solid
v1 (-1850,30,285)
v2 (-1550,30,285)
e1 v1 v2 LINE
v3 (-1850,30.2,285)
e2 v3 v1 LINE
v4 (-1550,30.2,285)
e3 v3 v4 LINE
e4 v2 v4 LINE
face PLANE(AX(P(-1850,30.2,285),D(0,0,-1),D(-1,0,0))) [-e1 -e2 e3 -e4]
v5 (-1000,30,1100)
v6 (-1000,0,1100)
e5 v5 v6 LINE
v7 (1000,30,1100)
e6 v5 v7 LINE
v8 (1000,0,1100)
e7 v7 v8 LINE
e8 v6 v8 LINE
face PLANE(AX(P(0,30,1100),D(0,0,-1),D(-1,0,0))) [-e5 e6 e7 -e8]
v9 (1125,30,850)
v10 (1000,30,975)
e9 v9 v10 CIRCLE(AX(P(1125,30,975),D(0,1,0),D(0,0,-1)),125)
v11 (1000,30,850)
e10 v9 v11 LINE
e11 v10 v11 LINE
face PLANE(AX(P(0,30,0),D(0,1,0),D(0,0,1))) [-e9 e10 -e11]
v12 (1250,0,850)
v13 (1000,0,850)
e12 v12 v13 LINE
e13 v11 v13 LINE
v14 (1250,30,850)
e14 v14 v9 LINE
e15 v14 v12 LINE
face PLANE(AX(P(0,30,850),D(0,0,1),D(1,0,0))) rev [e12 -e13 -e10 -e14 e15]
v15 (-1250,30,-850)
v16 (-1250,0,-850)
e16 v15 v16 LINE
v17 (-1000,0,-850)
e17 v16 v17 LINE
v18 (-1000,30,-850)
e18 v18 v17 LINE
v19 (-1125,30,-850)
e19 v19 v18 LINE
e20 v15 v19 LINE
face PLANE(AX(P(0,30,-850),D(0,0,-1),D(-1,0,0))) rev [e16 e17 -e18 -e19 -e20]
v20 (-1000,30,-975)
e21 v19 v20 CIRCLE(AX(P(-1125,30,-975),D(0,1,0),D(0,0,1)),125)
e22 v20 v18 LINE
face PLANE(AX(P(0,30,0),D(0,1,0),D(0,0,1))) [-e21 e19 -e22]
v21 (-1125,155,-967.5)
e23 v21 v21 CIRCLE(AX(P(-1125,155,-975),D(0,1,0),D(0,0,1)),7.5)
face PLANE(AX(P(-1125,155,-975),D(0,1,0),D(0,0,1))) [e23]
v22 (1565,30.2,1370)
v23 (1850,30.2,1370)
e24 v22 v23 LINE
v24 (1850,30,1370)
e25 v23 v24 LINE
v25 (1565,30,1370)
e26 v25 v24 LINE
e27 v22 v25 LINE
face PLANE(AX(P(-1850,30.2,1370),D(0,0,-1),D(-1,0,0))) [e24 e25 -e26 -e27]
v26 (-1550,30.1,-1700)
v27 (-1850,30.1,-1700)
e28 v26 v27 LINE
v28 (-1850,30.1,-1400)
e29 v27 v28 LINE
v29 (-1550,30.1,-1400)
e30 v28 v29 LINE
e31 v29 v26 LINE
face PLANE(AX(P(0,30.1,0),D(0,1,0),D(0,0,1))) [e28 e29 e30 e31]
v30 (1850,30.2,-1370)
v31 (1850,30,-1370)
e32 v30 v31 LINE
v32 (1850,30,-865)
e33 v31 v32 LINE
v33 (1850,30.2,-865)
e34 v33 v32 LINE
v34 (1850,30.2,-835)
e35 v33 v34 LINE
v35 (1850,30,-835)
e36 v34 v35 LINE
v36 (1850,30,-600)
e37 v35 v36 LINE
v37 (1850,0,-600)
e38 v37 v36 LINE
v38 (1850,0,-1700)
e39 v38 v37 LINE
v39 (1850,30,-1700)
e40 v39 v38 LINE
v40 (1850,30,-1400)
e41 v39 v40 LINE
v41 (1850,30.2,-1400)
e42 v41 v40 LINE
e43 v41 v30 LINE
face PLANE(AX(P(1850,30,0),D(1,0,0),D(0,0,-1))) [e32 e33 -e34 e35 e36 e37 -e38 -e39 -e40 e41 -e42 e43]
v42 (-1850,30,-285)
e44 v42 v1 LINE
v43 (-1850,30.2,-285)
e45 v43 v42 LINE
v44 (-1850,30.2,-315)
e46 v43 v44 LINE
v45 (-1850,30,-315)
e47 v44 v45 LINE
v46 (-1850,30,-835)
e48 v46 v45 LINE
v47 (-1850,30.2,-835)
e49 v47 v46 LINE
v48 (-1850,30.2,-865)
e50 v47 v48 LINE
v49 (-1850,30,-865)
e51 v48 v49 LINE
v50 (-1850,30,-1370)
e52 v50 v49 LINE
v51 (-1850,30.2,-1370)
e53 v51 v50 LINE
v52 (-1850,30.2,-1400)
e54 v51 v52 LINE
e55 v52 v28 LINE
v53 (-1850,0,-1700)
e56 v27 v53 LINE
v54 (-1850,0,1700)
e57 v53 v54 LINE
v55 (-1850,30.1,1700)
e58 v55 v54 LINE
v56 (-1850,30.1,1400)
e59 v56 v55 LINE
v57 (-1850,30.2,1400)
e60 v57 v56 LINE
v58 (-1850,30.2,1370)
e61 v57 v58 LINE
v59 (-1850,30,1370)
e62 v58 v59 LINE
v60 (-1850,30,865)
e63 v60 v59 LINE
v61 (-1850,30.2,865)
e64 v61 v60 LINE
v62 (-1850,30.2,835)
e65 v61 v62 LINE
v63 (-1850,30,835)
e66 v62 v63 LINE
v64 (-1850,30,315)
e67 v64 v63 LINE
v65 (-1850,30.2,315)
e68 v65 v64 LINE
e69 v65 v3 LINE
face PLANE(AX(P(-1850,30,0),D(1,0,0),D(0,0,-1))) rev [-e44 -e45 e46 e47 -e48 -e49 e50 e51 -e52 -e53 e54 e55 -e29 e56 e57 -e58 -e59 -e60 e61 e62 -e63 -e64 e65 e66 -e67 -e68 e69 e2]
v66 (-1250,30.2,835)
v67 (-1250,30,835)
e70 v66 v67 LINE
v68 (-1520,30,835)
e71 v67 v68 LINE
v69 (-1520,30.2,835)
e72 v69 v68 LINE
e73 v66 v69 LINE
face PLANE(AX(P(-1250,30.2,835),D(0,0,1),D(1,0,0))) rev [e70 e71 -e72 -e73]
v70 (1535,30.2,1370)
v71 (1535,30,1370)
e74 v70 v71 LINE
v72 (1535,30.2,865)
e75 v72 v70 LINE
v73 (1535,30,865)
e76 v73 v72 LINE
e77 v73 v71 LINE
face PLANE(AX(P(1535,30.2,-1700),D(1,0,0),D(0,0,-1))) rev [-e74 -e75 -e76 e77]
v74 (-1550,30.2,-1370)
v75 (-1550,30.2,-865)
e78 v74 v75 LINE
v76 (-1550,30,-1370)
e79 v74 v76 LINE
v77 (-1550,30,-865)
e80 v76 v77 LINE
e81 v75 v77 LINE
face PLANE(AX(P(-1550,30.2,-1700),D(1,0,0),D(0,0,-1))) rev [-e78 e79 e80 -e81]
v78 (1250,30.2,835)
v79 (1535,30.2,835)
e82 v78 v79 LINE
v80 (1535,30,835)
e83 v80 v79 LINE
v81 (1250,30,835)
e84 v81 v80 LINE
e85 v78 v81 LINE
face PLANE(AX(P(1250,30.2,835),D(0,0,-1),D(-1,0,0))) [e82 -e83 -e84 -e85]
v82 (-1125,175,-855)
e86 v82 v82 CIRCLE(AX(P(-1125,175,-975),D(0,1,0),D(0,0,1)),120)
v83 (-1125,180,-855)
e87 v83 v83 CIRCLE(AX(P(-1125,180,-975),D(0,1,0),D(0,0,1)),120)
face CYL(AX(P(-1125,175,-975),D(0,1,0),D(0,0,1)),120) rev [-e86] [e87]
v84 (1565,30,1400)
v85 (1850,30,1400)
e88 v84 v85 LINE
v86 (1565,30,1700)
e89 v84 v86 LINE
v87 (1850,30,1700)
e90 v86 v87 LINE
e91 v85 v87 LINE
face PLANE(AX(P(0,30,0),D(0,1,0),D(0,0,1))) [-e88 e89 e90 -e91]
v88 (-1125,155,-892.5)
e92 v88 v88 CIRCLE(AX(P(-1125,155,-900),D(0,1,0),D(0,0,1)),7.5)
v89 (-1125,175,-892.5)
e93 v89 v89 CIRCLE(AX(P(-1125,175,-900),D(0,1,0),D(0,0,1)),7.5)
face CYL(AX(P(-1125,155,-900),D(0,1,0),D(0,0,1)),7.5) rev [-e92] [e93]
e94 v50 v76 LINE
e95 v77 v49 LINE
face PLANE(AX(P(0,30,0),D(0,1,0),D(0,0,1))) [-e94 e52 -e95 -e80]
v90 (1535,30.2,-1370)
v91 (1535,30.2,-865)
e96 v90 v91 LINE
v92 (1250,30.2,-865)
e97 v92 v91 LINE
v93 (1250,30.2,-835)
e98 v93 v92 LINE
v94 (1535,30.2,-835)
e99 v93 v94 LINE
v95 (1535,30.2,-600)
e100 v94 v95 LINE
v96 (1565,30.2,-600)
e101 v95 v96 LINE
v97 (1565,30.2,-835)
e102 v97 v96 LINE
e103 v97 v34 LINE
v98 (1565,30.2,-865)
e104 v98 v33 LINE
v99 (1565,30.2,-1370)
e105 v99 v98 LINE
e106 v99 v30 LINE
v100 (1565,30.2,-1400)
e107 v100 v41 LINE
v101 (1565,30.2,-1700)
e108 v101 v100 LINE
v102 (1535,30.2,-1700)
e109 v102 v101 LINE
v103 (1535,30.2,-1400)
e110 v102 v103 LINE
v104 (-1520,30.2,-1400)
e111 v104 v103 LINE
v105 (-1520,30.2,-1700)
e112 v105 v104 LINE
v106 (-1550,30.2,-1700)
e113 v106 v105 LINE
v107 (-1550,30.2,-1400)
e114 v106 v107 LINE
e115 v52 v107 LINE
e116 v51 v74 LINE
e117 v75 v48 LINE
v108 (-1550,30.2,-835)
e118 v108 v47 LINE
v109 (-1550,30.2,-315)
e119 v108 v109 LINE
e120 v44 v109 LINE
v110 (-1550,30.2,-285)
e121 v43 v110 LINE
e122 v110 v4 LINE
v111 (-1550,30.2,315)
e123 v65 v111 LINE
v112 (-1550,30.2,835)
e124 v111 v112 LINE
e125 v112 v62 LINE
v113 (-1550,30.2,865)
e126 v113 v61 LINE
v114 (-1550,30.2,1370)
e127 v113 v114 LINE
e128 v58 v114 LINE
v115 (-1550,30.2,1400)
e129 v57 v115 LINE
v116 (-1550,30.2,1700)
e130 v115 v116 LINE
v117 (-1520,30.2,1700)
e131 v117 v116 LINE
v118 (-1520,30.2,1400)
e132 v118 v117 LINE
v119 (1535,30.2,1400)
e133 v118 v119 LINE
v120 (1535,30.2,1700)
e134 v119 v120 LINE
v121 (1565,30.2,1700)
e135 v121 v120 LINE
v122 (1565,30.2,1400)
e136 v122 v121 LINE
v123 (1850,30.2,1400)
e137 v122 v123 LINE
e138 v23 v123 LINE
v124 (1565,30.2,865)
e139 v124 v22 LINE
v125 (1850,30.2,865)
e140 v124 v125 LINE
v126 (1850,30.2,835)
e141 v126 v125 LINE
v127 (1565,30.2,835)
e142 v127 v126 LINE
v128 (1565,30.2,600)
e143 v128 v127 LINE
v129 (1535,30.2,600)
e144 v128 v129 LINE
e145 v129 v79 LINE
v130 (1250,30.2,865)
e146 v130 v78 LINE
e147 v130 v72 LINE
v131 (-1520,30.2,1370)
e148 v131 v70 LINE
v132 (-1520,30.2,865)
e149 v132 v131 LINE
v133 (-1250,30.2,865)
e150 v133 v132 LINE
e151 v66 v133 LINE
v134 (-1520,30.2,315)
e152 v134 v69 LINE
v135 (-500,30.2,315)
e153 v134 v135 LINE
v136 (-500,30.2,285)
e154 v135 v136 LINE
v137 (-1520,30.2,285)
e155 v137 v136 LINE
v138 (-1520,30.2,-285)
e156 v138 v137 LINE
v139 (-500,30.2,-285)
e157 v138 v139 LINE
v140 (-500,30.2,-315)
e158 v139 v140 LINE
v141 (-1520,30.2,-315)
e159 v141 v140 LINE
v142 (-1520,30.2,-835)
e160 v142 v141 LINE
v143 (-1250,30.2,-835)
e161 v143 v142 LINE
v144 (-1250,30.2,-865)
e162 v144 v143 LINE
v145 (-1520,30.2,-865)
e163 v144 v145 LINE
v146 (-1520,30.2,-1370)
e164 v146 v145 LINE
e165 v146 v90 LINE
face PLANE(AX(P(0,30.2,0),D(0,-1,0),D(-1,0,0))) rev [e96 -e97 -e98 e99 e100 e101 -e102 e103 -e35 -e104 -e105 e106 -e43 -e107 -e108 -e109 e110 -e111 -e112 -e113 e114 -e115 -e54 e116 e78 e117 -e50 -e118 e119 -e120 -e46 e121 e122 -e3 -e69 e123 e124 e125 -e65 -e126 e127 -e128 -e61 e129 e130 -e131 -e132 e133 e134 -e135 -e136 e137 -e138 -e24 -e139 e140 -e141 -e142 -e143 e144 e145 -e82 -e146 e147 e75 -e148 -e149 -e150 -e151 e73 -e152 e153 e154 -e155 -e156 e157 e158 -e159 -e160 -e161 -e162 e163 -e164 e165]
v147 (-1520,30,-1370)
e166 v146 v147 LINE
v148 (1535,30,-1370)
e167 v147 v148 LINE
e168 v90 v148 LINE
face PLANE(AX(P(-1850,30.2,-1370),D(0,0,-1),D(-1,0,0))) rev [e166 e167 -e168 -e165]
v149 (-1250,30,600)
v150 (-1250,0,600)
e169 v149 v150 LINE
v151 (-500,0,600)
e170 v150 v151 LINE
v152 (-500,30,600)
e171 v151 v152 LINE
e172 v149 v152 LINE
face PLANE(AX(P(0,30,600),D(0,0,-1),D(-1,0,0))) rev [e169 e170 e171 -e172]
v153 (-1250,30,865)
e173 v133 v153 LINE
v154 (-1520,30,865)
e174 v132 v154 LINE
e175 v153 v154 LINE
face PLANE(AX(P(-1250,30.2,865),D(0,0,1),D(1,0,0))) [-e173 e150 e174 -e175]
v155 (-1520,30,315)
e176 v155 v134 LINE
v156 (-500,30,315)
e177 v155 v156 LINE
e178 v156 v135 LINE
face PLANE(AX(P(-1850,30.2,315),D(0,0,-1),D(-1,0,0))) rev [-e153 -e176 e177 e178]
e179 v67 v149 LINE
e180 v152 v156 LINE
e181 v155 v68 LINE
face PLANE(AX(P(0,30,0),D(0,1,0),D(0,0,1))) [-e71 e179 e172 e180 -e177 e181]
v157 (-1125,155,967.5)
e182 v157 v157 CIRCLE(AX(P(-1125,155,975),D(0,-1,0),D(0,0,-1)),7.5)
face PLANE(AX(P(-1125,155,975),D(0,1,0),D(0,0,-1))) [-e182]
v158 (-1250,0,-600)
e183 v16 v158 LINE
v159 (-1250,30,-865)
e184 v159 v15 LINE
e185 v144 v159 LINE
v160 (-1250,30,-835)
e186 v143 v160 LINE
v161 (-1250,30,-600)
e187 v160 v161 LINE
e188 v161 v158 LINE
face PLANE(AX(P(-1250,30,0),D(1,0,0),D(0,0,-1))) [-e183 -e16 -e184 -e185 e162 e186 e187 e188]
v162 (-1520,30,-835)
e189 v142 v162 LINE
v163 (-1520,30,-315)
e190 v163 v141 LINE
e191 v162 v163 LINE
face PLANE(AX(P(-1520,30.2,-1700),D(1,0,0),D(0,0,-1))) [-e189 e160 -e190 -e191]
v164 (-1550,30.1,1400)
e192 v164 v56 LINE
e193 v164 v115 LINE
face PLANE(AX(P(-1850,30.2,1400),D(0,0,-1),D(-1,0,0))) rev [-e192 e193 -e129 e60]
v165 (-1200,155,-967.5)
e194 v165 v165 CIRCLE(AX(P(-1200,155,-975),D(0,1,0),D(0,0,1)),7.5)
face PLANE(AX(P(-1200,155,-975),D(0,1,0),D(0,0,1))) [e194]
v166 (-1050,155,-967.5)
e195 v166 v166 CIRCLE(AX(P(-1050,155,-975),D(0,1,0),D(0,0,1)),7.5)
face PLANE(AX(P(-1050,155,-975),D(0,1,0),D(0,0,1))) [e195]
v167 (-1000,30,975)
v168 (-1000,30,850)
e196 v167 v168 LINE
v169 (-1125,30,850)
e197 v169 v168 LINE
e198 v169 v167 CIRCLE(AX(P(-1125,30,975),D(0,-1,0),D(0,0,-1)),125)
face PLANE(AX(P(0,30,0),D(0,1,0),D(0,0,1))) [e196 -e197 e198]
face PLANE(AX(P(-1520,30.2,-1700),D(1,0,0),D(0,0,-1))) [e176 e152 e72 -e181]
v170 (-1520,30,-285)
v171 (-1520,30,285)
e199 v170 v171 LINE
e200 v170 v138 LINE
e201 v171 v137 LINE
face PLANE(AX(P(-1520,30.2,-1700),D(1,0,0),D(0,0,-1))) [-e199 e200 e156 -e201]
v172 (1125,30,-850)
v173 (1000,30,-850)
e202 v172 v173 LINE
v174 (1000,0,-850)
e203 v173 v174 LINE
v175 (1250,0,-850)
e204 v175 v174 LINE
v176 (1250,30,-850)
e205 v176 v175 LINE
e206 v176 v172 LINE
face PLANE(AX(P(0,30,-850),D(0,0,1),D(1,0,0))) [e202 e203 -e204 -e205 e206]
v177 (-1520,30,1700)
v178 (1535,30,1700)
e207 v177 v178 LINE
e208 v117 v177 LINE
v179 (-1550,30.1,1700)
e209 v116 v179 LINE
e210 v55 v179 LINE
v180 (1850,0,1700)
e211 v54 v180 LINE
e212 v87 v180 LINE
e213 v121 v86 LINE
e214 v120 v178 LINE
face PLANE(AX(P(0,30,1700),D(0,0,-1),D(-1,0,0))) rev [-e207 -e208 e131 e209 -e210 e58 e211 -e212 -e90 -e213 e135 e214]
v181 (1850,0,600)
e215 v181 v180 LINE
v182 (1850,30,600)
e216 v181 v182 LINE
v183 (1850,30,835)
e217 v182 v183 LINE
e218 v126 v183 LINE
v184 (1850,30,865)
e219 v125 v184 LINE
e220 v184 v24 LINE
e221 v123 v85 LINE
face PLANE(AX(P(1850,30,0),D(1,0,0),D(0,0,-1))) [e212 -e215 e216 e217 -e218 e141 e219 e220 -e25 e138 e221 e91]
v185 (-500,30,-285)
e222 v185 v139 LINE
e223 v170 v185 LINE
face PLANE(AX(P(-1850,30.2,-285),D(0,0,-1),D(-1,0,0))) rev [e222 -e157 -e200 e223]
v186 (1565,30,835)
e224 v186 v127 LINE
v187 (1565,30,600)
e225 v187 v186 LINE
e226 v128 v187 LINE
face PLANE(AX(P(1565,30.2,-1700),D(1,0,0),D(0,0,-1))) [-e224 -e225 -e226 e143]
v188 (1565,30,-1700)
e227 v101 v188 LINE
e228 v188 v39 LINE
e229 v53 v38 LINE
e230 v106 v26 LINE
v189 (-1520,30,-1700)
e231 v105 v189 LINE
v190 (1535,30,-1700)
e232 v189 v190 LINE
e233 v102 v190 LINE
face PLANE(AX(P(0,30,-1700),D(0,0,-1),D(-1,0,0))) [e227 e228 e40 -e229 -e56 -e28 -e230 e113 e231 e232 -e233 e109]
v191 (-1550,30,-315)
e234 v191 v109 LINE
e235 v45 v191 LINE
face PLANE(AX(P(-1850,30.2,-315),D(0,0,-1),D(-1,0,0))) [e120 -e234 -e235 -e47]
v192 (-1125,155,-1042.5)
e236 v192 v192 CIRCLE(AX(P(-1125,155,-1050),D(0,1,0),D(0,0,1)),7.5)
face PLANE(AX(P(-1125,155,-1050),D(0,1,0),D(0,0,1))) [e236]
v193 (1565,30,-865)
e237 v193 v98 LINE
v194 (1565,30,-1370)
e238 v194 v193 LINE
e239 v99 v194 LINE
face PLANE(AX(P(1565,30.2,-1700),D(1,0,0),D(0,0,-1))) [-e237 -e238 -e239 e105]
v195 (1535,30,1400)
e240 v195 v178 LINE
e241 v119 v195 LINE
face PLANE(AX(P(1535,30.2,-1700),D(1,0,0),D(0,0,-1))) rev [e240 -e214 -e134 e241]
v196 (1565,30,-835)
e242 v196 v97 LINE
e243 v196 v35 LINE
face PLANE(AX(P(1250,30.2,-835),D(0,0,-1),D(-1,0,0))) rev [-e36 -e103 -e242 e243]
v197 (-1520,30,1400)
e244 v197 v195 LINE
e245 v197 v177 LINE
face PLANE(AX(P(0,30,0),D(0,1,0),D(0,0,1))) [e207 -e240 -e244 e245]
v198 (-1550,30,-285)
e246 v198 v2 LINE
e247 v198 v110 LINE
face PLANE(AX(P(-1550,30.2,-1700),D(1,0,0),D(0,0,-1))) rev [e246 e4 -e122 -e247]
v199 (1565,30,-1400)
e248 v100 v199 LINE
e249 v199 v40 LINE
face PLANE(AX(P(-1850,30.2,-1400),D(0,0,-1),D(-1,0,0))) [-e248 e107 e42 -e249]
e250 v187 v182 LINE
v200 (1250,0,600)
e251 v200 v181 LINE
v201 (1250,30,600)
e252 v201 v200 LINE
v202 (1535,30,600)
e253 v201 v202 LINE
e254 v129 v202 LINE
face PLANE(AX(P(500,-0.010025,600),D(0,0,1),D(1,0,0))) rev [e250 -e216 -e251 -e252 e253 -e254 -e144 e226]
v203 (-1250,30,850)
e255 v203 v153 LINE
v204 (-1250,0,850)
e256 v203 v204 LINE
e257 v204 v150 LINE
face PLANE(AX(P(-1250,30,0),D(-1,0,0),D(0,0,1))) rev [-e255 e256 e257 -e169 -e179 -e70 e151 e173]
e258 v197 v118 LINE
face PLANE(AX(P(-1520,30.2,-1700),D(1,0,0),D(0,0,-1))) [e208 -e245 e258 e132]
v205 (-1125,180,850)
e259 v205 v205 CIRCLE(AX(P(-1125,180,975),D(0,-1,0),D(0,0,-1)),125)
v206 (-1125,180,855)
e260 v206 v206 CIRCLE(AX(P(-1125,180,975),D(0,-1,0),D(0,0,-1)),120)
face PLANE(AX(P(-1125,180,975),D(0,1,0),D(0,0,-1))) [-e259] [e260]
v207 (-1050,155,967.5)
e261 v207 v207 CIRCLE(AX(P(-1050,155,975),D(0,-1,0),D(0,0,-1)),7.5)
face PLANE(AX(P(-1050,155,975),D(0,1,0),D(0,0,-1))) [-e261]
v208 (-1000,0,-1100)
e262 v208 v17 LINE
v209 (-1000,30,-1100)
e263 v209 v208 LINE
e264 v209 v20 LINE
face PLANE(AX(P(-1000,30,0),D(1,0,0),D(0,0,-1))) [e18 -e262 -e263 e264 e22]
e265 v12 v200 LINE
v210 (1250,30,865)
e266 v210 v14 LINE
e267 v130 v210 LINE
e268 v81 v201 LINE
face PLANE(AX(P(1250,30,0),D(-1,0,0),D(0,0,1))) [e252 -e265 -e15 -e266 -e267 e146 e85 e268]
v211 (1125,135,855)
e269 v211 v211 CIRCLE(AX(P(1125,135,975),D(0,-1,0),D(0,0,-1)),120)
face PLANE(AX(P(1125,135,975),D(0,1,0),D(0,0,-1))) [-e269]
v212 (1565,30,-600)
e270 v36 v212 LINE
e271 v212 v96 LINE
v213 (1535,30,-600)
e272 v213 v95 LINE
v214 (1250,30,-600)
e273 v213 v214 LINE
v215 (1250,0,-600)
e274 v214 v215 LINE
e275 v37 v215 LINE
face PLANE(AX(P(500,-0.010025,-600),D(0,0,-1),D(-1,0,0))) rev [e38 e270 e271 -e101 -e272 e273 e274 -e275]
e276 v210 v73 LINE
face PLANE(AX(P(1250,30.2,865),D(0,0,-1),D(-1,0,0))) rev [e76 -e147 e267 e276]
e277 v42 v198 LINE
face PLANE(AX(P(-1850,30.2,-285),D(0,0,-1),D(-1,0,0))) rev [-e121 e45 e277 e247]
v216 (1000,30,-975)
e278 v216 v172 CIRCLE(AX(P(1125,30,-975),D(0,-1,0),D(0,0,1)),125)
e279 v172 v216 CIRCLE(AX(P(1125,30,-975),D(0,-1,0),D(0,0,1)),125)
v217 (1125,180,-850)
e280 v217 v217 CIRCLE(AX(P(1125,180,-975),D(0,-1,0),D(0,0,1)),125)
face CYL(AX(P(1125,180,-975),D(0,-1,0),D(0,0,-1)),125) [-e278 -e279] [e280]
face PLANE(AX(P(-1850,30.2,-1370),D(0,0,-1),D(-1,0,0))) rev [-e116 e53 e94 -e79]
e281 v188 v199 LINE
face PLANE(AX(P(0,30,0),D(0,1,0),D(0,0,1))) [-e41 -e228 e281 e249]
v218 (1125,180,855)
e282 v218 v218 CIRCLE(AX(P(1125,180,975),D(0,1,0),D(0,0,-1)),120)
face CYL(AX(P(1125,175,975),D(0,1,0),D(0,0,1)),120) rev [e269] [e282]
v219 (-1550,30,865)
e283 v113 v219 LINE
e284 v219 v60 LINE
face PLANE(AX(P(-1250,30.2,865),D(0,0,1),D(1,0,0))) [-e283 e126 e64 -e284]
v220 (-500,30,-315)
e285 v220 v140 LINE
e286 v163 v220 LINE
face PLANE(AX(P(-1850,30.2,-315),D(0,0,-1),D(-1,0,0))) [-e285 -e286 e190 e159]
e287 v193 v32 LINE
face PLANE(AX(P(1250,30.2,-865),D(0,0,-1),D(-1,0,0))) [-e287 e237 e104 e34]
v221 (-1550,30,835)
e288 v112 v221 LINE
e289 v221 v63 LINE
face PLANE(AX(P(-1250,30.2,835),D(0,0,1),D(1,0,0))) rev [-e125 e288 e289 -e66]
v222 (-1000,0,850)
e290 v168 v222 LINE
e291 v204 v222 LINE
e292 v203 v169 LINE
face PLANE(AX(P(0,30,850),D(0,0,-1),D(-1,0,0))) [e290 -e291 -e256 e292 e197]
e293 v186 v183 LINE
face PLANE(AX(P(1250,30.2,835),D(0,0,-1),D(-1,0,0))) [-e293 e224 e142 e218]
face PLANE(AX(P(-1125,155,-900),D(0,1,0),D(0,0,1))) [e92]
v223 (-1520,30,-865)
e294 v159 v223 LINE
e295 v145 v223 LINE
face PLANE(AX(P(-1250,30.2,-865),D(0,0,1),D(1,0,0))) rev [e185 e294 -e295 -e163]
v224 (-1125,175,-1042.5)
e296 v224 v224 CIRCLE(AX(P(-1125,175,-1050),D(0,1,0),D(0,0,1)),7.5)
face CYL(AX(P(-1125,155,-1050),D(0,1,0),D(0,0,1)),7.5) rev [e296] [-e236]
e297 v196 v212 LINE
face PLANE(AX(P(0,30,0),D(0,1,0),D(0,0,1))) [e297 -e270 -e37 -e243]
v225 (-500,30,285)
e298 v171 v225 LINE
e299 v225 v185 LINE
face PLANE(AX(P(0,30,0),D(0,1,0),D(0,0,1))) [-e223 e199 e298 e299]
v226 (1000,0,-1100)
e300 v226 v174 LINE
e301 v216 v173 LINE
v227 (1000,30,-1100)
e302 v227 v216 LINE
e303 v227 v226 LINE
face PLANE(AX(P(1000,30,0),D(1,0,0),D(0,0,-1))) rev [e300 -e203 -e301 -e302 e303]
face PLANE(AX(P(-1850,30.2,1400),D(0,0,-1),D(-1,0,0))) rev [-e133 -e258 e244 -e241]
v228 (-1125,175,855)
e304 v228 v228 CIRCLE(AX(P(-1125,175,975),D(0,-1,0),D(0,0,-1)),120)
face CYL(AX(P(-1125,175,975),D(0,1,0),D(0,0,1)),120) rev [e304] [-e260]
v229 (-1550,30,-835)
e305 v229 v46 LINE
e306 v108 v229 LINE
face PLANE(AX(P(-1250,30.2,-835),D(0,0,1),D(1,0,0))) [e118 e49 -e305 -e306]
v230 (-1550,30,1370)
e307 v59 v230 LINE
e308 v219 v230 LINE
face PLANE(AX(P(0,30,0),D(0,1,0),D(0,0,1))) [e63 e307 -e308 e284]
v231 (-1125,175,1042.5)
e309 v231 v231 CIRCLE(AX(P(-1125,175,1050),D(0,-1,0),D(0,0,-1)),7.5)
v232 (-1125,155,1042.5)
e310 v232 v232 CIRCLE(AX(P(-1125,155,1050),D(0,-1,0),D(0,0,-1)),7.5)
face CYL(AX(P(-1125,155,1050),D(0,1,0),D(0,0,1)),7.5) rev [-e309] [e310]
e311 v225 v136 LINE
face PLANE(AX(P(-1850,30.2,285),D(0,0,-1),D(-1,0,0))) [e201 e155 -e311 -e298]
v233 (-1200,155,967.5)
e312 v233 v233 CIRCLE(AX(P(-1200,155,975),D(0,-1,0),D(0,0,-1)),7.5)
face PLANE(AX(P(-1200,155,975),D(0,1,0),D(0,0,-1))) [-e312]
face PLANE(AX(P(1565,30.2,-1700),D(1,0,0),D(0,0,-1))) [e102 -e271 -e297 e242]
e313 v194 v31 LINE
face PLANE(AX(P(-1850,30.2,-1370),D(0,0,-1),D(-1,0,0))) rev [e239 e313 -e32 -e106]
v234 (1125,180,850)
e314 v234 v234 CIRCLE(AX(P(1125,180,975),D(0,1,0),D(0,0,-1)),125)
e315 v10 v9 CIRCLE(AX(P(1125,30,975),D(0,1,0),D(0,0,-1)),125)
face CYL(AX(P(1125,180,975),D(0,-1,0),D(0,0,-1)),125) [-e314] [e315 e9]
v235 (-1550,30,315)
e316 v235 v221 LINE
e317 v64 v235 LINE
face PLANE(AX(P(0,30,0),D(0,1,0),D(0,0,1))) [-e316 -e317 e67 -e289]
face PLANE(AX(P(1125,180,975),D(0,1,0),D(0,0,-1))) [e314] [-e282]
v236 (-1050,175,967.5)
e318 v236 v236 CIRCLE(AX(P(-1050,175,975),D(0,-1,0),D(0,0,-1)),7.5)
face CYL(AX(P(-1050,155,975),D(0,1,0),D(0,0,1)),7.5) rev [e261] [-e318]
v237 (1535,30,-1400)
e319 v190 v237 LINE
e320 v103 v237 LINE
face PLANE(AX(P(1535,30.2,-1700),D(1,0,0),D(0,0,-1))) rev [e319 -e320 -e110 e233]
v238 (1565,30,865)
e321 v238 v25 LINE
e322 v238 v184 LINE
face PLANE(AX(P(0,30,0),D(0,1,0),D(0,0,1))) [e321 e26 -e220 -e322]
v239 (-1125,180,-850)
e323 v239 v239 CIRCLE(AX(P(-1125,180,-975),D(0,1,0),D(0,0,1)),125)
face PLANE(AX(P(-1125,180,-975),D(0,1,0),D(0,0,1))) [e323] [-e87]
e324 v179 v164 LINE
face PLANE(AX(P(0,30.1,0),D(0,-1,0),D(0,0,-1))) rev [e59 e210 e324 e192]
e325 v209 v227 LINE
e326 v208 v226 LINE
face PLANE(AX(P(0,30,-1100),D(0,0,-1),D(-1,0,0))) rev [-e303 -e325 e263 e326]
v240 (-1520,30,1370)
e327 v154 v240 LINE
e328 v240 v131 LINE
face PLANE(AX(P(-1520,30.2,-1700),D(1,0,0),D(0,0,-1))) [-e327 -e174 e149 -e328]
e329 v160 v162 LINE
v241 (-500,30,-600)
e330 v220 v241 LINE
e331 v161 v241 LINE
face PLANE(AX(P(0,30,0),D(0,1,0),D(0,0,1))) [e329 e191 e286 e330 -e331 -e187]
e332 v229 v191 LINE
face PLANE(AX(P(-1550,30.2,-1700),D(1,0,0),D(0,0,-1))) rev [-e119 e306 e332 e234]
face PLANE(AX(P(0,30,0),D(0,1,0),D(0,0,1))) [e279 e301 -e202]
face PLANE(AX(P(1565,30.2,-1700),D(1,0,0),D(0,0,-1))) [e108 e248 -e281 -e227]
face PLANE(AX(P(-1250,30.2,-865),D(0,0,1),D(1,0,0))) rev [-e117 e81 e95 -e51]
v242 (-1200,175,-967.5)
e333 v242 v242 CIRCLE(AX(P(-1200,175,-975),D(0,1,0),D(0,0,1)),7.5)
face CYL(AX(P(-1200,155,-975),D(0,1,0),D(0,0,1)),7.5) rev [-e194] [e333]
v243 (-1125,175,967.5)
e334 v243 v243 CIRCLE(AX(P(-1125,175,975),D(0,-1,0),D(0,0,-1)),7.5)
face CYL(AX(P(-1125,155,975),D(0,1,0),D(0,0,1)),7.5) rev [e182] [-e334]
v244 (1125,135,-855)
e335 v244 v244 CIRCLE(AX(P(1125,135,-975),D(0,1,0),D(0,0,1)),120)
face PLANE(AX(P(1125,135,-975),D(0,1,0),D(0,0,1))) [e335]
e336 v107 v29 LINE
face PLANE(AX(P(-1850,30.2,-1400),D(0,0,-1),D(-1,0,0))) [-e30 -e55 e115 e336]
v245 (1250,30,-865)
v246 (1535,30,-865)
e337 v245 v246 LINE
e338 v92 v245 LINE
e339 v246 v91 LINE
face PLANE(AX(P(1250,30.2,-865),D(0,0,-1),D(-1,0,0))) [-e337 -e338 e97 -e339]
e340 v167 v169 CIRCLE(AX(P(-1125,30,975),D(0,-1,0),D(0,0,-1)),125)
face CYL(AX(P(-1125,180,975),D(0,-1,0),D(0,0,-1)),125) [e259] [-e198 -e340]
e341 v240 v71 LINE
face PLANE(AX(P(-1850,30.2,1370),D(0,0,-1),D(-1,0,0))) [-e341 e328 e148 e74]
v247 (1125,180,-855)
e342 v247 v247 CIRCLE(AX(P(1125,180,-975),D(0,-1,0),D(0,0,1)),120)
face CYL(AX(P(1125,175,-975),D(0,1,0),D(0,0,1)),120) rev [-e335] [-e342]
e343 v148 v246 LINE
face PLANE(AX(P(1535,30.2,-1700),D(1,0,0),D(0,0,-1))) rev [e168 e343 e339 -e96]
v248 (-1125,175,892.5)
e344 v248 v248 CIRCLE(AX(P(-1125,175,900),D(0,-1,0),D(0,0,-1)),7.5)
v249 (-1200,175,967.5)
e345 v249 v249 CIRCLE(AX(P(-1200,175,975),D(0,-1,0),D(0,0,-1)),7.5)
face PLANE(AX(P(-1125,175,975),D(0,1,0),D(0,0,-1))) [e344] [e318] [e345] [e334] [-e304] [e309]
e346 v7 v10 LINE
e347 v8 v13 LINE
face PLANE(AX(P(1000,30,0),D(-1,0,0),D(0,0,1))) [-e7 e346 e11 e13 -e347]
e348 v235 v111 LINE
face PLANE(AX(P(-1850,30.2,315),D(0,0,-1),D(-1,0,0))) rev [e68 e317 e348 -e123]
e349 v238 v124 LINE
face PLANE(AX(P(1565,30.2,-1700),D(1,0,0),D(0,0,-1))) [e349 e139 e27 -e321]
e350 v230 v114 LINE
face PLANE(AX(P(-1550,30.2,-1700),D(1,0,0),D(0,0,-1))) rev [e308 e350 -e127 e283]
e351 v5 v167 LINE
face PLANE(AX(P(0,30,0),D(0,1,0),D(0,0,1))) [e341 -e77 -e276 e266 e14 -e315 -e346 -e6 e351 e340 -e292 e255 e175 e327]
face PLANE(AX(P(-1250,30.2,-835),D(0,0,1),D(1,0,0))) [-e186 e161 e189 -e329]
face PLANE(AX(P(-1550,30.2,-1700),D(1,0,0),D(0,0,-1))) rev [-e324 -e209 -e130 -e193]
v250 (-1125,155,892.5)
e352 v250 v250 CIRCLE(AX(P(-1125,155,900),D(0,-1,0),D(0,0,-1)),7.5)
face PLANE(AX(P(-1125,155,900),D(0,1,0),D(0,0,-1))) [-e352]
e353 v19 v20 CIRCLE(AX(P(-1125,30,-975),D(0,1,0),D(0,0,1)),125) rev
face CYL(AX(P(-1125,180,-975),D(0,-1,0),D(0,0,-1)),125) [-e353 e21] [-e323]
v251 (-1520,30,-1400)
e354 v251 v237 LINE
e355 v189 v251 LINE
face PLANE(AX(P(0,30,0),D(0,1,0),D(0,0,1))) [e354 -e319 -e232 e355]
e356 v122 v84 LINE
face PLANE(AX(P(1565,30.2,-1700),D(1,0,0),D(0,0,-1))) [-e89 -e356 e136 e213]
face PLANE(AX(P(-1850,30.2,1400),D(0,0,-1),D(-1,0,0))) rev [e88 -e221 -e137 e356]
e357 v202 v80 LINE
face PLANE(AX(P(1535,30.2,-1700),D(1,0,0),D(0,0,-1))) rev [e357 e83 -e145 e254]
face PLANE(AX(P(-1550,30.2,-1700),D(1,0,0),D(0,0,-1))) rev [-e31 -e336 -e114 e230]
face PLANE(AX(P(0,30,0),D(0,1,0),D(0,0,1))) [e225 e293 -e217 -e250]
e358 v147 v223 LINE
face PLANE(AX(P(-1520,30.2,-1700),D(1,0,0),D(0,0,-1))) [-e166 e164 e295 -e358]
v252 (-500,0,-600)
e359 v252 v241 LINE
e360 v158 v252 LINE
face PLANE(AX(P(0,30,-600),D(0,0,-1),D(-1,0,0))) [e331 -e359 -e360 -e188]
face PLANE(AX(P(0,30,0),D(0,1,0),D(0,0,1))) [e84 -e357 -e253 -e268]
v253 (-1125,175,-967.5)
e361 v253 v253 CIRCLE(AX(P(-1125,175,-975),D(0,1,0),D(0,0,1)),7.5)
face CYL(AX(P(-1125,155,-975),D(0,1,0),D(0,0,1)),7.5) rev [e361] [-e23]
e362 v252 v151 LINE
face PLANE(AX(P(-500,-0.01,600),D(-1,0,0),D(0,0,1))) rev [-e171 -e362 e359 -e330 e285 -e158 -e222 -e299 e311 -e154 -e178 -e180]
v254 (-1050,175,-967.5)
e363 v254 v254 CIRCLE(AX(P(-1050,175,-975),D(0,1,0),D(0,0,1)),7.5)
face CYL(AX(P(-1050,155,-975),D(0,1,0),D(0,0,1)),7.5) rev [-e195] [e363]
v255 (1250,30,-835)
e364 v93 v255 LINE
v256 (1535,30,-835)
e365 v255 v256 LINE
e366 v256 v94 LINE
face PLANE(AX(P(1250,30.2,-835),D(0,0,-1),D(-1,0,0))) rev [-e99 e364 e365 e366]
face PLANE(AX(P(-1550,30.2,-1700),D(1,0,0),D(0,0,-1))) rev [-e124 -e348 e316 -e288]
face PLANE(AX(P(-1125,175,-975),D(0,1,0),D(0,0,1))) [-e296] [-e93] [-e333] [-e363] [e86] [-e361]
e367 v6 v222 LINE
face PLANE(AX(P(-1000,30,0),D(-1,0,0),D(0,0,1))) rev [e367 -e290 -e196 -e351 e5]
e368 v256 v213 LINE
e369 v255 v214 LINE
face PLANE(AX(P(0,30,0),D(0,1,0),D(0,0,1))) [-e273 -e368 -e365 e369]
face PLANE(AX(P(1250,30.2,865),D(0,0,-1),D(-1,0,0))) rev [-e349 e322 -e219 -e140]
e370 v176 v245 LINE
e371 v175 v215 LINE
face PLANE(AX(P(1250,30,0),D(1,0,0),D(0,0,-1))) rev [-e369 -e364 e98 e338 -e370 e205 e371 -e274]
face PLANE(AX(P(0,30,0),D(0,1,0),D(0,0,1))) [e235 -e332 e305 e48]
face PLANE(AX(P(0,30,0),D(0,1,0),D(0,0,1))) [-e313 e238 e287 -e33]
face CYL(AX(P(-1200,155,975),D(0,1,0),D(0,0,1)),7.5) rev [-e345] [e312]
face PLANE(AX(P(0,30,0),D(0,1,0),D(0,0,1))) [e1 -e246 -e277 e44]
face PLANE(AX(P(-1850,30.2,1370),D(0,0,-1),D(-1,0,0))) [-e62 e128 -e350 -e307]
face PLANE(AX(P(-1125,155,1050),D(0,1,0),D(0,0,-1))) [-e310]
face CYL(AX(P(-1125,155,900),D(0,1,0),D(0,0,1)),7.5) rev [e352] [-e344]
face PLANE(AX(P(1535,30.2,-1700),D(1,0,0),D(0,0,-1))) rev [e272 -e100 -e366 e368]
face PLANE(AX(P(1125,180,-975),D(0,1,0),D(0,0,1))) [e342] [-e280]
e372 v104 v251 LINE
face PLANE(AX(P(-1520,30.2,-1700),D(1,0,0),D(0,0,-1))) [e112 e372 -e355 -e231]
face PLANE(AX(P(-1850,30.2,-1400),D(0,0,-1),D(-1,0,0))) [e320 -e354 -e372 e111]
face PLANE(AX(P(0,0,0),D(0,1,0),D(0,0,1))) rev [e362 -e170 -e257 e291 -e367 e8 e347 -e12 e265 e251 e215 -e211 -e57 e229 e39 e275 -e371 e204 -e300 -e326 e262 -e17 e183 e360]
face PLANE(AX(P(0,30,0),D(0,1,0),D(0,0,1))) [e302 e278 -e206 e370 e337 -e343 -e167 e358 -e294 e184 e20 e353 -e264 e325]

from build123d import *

# Parameters (mm, degrees)
SKETCH1_W               = 3700
SKETCH1_H               = 3400
SKETCH1_W_2             = 2500
SKETCH1_H_2             = 500
SKETCH1_W_3             = 250
SKETCH1_H_3             = 250
BOSS_EXTRUDE1_DEPTH     = 30
BOSS_EXTRUDE2_DEPTH     = 600
SKETCH3_R               = 125
BOSS_EXTRUDE3_DEPTH     = 150
SKETCH4_R               = 120
CUT_EXTRUDE1_DEPTH      = 5
SKETCH5_R               = 7.5
CUT_EXTRUDE2_DEPTH      = 20
MIRROR3_COPY_1_SKETCH_R = 125
MIRROR3_COPY_1_DEPTH    = 150
MIRROR3_COPY_2_SKETCH_R = 120
MIRROR3_COPY_2_DEPTH    = 5
MIRROR3_COPY_3_SKETCH_R = 7.5
MIRROR3_COPY_3_DEPTH    = 20
SKETCH6_R               = 120
CUT_EXTRUDE3_DEPTH      = 40
SKETCH7_W               = 300
SKETCH7_H               = 300
BOSS_EXTRUDE4_DEPTH     = 0.1
SKETCH8_W               = 3700
SKETCH8_H               = 30
SKETCH8_W_2             = 30
SKETCH8_H_2             = 3400
SKETCH8_W_3             = 600
SKETCH8_W_4             = 2350
EXTRUDE_THIN1_DEPTH     = 0.2
SKETCH9_W               = 230.740107676
SKETCH9_H               = 30
EXTRUDE_THIN2_DEPTH     = 0.1
SKETCH10_W              = 600
SKETCH10_H              = 30
EXTRUDE_THIN3_DEPTH     = 0.1
SKETCH11_R              = 21
BOSS_EXTRUDE5_DEPTH     = 350
SPLIT3_SURFACE_1_BACK   = 5040.286
SPLIT3_SURFACE_1_DEPTH  = 10080.572
SPLIT3_SURFACE_2_BACK   = 5040.286
SPLIT3_SURFACE_2_DEPTH  = 10080.572
SAVE_START              = -600
SAVE_BODIES1_DEPTH      = 1200
SPLIT5_SURFACE_3_BACK   = 5040.286
SPLIT5_SURFACE_3_DEPTH  = 10080.572
SPLIT5_SURFACE_4_BACK   = 5040.286
SPLIT5_SURFACE_4_DEPTH  = 10080.572
SAVE_BODIES2_OUTLINE_W  = 1350
SAVE_BODIES2_OUTLINE_H  = 1200
SAVE_BODIES2_DEPTH      = 380


# Read off the part's stored shape, not the designer's step: Save Bodies1, Save Bodies2
with BuildPart() as part:
    # Sketch1 → Boss-Extrude1 (new body)
    # profile 1 of 5: a face of its own
    with BuildSketch(Plane(origin=(0, 0, 0), x_dir=(1, 0, 0), z_dir=(0, 1, 0))):
        Rectangle(SKETCH1_W, SKETCH1_H)
        with Locations((0, 850)):
            Rectangle(SKETCH1_W_2, SKETCH1_H_2, mode=Mode.SUBTRACT)
        with Locations((0, -850)):
            Rectangle(SKETCH1_W_2, SKETCH1_H_2, mode=Mode.SUBTRACT)
    # profile 2 of 5: a face of its own
    with BuildSketch(Plane(origin=(0, 0, 0), x_dir=(1, 0, 0), z_dir=(0, 1, 0))):
        with Locations((-1125, 975)):
            Rectangle(SKETCH1_W_3, SKETCH1_H_3)
    # profile 3 of 5: a face of its own
    with BuildSketch(Plane(origin=(0, 0, 0), x_dir=(1, 0, 0), z_dir=(0, 1, 0))):
        with Locations((1125, 975)):
            Rectangle(SKETCH1_W_3, SKETCH1_H_3)
    # profile 4 of 5: a face of its own
    with BuildSketch(Plane(origin=(0, 0, 0), x_dir=(1, 0, 0), z_dir=(0, 1, 0))):
        with Locations((1125, -975)):
            Rectangle(SKETCH1_W_3, SKETCH1_H_3)
    # profile 5 of 5: a face of its own
    with BuildSketch(Plane(origin=(0, 0, 0), x_dir=(1, 0, 0), z_dir=(0, 1, 0))):
        with Locations((-1125, -975)):
            Rectangle(SKETCH1_W_3, SKETCH1_H_3)
    extrude(amount=BOSS_EXTRUDE1_DEPTH)

    # Sketch2 → Boss-Extrude2 (add, symmetric)
    with BuildSketch(Plane.XY):
        Polygon((-500, 30), (-300, 145.470053838), (300, 145.470053838), (500, 30), align=None)
    extrude(amount=BOSS_EXTRUDE2_DEPTH, both=True)

    # Sketch3 → Boss-Extrude3 (add)
    with BuildSketch(Plane(origin=(0, 30, 0), x_dir=(1, 0, 0), z_dir=(0, 1, 0))):
        with Locations(Location((-1125, 975, 0), (0, 0, 270))):
            Circle(SKETCH3_R)
    boss_extrude3 = extrude(amount=BOSS_EXTRUDE3_DEPTH)

    # Sketch4 → Cut-Extrude1 (cut)
    with BuildSketch(Plane(origin=(0, 180, 0), x_dir=(1, 0, 0), z_dir=(0, 1, 0))):
        with Locations(Location((-1125, 975, 0), (0, 0, 270))):
            Circle(SKETCH4_R)
    cut_extrude1 = extrude(amount=-CUT_EXTRUDE1_DEPTH, mode=Mode.SUBTRACT)

    # Sketch5 → Cut-Extrude2 (cut)
    with BuildSketch(Plane(origin=(0, 175, 0), x_dir=(1, 0, 0), z_dir=(0, 1, 0))):
        with Locations(Location((-1125, 975, 0), (0, 0, 270))):
            Circle(SKETCH5_R)
        with Locations(Location((-1050, 975, 0), (0, 0, 270))):
            Circle(SKETCH5_R)
        with Locations(Location((-1125, 900, 0), (0, 0, 270))):
            Circle(SKETCH5_R)
        with Locations(Location((-1200, 975, 0), (0, 0, 270))):
            Circle(SKETCH5_R)
        with Locations(Location((-1125, 1050, 0), (0, 0, 270))):
            Circle(SKETCH5_R)
    cut_extrude2 = extrude(amount=-CUT_EXTRUDE2_DEPTH, mode=Mode.SUBTRACT)

    # Mirror2: Boss-Extrude3, Cut-Extrude1, Cut-Extrude2 across plane
    add(boss_extrude3.mirror(Plane.XY))
    add(cut_extrude1.mirror(Plane.XY), mode=Mode.SUBTRACT)
    add(cut_extrude2.mirror(Plane.XY), mode=Mode.SUBTRACT)

    # Mirror3: Boss-Extrude3, Cut-Extrude1, Cut-Extrude2 across plane
    add(boss_extrude3.mirror(Plane(origin=(0, 0, 0), x_dir=(0, 0, 1), z_dir=(1, 0, 0))))
    add(cut_extrude1.mirror(Plane(origin=(0, 0, 0), x_dir=(0, 0, 1), z_dir=(1, 0, 0))), mode=Mode.SUBTRACT)
    add(cut_extrude2.mirror(Plane(origin=(0, 0, 0), x_dir=(0, 0, 1), z_dir=(1, 0, 0))), mode=Mode.SUBTRACT)

    # Mirror3 copy 1 sketch → Mirror3 copy 1 (add)
    with BuildSketch(Plane(origin=(0, 30, 0), x_dir=(-1, 0, 0), z_dir=(0, 1, 0))):
        with Locations(Location((-1125, 975, 0), (0, 0, 270))):
            Circle(MIRROR3_COPY_1_SKETCH_R)
    extrude(amount=MIRROR3_COPY_1_DEPTH)

    # Mirror3 copy 2 sketch → Mirror3 copy 2 (cut)
    with BuildSketch(Plane(origin=(0, 180, 0), x_dir=(-1, 0, 0), z_dir=(0, 1, 0))):
        with Locations(Location((-1125, 975, 0), (0, 0, 270))):
            Circle(MIRROR3_COPY_2_SKETCH_R)
    extrude(amount=-MIRROR3_COPY_2_DEPTH, mode=Mode.SUBTRACT)

    # Mirror3 copy 3 sketch → Mirror3 copy 3 (cut)
    with BuildSketch(Plane(origin=(0, 175, 0), x_dir=(-1, 0, 0), z_dir=(0, 1, 0))):
        with Locations(Location((-1125, 975, 0), (0, 0, 270))):
            Circle(MIRROR3_COPY_3_SKETCH_R)
        with Locations(Location((-1050, 975, 0), (0, 0, 270))):
            Circle(MIRROR3_COPY_3_SKETCH_R)
        with Locations(Location((-1125, 900, 0), (0, 0, 270))):
            Circle(MIRROR3_COPY_3_SKETCH_R)
        with Locations(Location((-1200, 975, 0), (0, 0, 270))):
            Circle(MIRROR3_COPY_3_SKETCH_R)
        with Locations(Location((-1125, 1050, 0), (0, 0, 270))):
            Circle(MIRROR3_COPY_3_SKETCH_R)
    extrude(amount=-MIRROR3_COPY_3_DEPTH, mode=Mode.SUBTRACT)

    # Sketch6 → Cut-Extrude3 (cut)
    with BuildSketch(Plane(origin=(0, 175, 0), x_dir=(1, 0, 0), z_dir=(0, 1, 0))):
        with Locations(Location((1125, 975, 0), (0, 0, 270))):
            Circle(SKETCH6_R)
    cut_extrude3 = extrude(amount=-CUT_EXTRUDE3_DEPTH, mode=Mode.SUBTRACT)

    # Mirror4: Cut-Extrude3 across plane
    add(cut_extrude3.mirror(Plane.XY), mode=Mode.SUBTRACT)

    # Sketch7 → Boss-Extrude4 (add)
    with BuildSketch(Plane(origin=(0, 30, 0), x_dir=(1, 0, 0), z_dir=(0, 1, 0))):
        with Locations((-1700, 1550)):
            Rectangle(SKETCH7_W, SKETCH7_H)
        with Locations((-1700, -1550)):
            Rectangle(SKETCH7_W, SKETCH7_H)
    extrude(amount=BOSS_EXTRUDE4_DEPTH)

    # Sketch8 → Extrude-Thin1 (add)
    with BuildSketch(Plane(origin=(0, 30, 0), x_dir=(1, 0, 0), z_dir=(0, 1, 0))):
        with Locations((0, 1385)):
            Rectangle(SKETCH8_W, SKETCH8_H)
        with Locations((-1535, 0)):
            Rectangle(SKETCH8_W_2, SKETCH8_H_2)
        with Locations((1550, 0)):
            Rectangle(SKETCH8_W_2, SKETCH8_H_2)
        with Locations((-1550, 850)):
            Rectangle(SKETCH8_W_3, SKETCH8_H)
        with Locations((-675, 300)):
            Rectangle(SKETCH8_W_4, SKETCH8_H)
        with Locations((-675, -300)):
            Rectangle(SKETCH8_W_4, SKETCH8_H)
        with Locations((0, -1385)):
            Rectangle(SKETCH8_W, SKETCH8_H)
        with Locations((-1550, -850)):
            Rectangle(SKETCH8_W_3, SKETCH8_H)
        with Locations((1550, 850)):
            Rectangle(SKETCH8_W_3, SKETCH8_H)
        with Locations((1550, -850)):
            Rectangle(SKETCH8_W_3, SKETCH8_H)
    extrude(amount=EXTRUDE_THIN1_DEPTH)

    # Sketch9 → Extrude-Thin2 (add)
    with BuildSketch(Plane(origin=(-137.990381057, 239.006350946, 0), x_dir=(0.8660254037844415, 0.4999999999999951, 0), z_dir=(-0.49999999999999517, 0.8660254037844416, 0))):
        with Locations((-302.442648054, 300)):
            Rectangle(SKETCH9_W, SKETCH9_H)
        with Locations((-302.442648054, -300)):
            Rectangle(SKETCH9_W, SKETCH9_H)
    extrude_thin2 = extrude(amount=EXTRUDE_THIN2_DEPTH)

    # Sketch10 → Extrude-Thin3 (add)
    with BuildSketch(Plane(origin=(0, 145.470053838, 0), x_dir=(1, 0, 0), z_dir=(0, 1, 0))):
        with Locations((0, 300)):
            Rectangle(SKETCH10_W, SKETCH10_H)
        with Locations((0, -300)):
            Rectangle(SKETCH10_W, SKETCH10_H)
    extrude(amount=EXTRUDE_THIN3_DEPTH)

    # Mirror5: Extrude-Thin2 across plane
    add(extrude_thin2.mirror(Plane(origin=(0, 0, 0), x_dir=(0, 0, 1), z_dir=(1, 0, 0))))

    # Sketch11 → Boss-Extrude5 (add)
    with BuildSketch(Plane(origin=(0, 30, 0), x_dir=(1, 0, 0), z_dir=(0, 1, 0))):
        with Locations(Location((850, -298.836957303, 0), (0, 0, 270))):
            Circle(SKETCH11_R)
        with Locations(Location((1050, -448.836957303, 0), (0, 0, 270))):
            Circle(SKETCH11_R)
        with Locations(Location((1450, -298.836957303, 0), (0, 0, 270))):
            Circle(SKETCH11_R)
        with Locations(Location((1250, -148.836957303, 0), (0, 0, 270))):
            Circle(SKETCH11_R)
    boss_extrude5 = extrude(amount=BOSS_EXTRUDE5_DEPTH)

    # Mirror6: Boss-Extrude5 across plane
    add(boss_extrude5.mirror(Plane.XY))


with BuildPart() as body_2:
    # Split3: the piece behind the surface
    add(part.part)
    # Split3 surface: a surface, the sketch's curves swept straight by 10080.572 mm
    with BuildLine(Plane(origin=(0, 30, 0), x_dir=(1, 0, 0), z_dir=(0, 1, 0)).offset(-SPLIT3_SURFACE_1_BACK), mode=Mode.PRIVATE) as split3_surface_1_path:
        Line((500, -600), (-500, -600))
        Line((-500, -600), (-500, 600))
        Line((-500, 600), (500, 600))
        Line((500, 600), (500, -600))
    split3_surface_1 = Shell.extrude(split3_surface_1_path.wire(), (0 * SPLIT3_SURFACE_1_DEPTH, 1 * SPLIT3_SURFACE_1_DEPTH, 0 * SPLIT3_SURFACE_1_DEPTH))
    split(bisect_by=split3_surface_1, keep=Keep.BOTTOM)

    # Save Bodies1 outline → Save Bodies1 (cut)
    with BuildSketch(Plane.XY.offset(SAVE_START)):
        Polygon((500, 30.2), (499.853589838, 30.2), (300.05, 145.556656378), (300, 145.470053838), (300, 145.570053838), (-300, 145.570053838), (-300, 145.470053838), (-300.05, 145.556656378), (-499.853589838, 30.2), (-500, 30.2), (-500, 0), (500, 0), align=None)
    extrude(amount=SAVE_BODIES1_DEPTH, mode=Mode.SUBTRACT)


with BuildPart() as part_1:
    add(part.part)

    # Split3: split by a surface, the side it looks to stays
    # Split3 surface: a surface, the sketch's curves swept straight by 10080.572 mm
    with BuildLine(Plane(origin=(0, 30, 0), x_dir=(1, 0, 0), z_dir=(0, 1, 0)).offset(-SPLIT3_SURFACE_2_BACK), mode=Mode.PRIVATE) as split3_surface_2_path:
        Line((500, -600), (-500, -600))
        Line((-500, -600), (-500, 600))
        Line((-500, 600), (500, 600))
        Line((500, 600), (500, -600))
    split3_surface_2 = Shell.extrude(split3_surface_2_path.wire(), (0 * SPLIT3_SURFACE_2_DEPTH, 1 * SPLIT3_SURFACE_2_DEPTH, 0 * SPLIT3_SURFACE_2_DEPTH))
    split(bisect_by=split3_surface_2, keep=Keep.TOP)


with BuildPart() as body_2_2:
    # Split5: the piece behind the surface
    add(part_1.part)
    # Split5 surface: a surface, the sketch's curves swept straight by 10080.572 mm
    with BuildLine(Plane(origin=(0, 30, 0), x_dir=(1, 0, 0), z_dir=(0, 1, 0)).offset(-SPLIT5_SURFACE_3_BACK), mode=Mode.PRIVATE) as split5_surface_3_path:
        Line((500, 600), (1850, 600))
        Line((1850, 600), (1850, -600))
        Line((1850, -600), (500, -600))
        Line((500, -600), (500, 600))
    split5_surface_3 = Shell.extrude(split5_surface_3_path.wire(), (0 * SPLIT5_SURFACE_3_DEPTH, 1 * SPLIT5_SURFACE_3_DEPTH, 0 * SPLIT5_SURFACE_3_DEPTH))
    split(bisect_by=split5_surface_3, keep=Keep.BOTTOM)

    # Save Bodies2 outline → Save Bodies2 (cut)
    with BuildSketch(Plane(origin=(0, 0, 0), x_dir=(1, 0, 0), z_dir=(0, 1, 0))):
        with Locations((1175, 0)):
            Rectangle(SAVE_BODIES2_OUTLINE_W, SAVE_BODIES2_OUTLINE_H)
    extrude(amount=SAVE_BODIES2_DEPTH, mode=Mode.SUBTRACT)


with BuildPart() as part_2:
    add(part_1.part)

    # Split5: split by a surface, the side it looks to stays
    # Split5 surface: a surface, the sketch's curves swept straight by 10080.572 mm
    with BuildLine(Plane(origin=(0, 30, 0), x_dir=(1, 0, 0), z_dir=(0, 1, 0)).offset(-SPLIT5_SURFACE_4_BACK), mode=Mode.PRIVATE) as split5_surface_4_path:
        Line((500, 600), (1850, 600))
        Line((1850, 600), (1850, -600))
        Line((1850, -600), (500, -600))
        Line((500, -600), (500, 600))
    split5_surface_4 = Shell.extrude(split5_surface_4_path.wire(), (0 * SPLIT5_SURFACE_4_DEPTH, 1 * SPLIT5_SURFACE_4_DEPTH, 0 * SPLIT5_SURFACE_4_DEPTH))
    split(bisect_by=split5_surface_4, keep=Keep.TOP)


solid = part_2.part
